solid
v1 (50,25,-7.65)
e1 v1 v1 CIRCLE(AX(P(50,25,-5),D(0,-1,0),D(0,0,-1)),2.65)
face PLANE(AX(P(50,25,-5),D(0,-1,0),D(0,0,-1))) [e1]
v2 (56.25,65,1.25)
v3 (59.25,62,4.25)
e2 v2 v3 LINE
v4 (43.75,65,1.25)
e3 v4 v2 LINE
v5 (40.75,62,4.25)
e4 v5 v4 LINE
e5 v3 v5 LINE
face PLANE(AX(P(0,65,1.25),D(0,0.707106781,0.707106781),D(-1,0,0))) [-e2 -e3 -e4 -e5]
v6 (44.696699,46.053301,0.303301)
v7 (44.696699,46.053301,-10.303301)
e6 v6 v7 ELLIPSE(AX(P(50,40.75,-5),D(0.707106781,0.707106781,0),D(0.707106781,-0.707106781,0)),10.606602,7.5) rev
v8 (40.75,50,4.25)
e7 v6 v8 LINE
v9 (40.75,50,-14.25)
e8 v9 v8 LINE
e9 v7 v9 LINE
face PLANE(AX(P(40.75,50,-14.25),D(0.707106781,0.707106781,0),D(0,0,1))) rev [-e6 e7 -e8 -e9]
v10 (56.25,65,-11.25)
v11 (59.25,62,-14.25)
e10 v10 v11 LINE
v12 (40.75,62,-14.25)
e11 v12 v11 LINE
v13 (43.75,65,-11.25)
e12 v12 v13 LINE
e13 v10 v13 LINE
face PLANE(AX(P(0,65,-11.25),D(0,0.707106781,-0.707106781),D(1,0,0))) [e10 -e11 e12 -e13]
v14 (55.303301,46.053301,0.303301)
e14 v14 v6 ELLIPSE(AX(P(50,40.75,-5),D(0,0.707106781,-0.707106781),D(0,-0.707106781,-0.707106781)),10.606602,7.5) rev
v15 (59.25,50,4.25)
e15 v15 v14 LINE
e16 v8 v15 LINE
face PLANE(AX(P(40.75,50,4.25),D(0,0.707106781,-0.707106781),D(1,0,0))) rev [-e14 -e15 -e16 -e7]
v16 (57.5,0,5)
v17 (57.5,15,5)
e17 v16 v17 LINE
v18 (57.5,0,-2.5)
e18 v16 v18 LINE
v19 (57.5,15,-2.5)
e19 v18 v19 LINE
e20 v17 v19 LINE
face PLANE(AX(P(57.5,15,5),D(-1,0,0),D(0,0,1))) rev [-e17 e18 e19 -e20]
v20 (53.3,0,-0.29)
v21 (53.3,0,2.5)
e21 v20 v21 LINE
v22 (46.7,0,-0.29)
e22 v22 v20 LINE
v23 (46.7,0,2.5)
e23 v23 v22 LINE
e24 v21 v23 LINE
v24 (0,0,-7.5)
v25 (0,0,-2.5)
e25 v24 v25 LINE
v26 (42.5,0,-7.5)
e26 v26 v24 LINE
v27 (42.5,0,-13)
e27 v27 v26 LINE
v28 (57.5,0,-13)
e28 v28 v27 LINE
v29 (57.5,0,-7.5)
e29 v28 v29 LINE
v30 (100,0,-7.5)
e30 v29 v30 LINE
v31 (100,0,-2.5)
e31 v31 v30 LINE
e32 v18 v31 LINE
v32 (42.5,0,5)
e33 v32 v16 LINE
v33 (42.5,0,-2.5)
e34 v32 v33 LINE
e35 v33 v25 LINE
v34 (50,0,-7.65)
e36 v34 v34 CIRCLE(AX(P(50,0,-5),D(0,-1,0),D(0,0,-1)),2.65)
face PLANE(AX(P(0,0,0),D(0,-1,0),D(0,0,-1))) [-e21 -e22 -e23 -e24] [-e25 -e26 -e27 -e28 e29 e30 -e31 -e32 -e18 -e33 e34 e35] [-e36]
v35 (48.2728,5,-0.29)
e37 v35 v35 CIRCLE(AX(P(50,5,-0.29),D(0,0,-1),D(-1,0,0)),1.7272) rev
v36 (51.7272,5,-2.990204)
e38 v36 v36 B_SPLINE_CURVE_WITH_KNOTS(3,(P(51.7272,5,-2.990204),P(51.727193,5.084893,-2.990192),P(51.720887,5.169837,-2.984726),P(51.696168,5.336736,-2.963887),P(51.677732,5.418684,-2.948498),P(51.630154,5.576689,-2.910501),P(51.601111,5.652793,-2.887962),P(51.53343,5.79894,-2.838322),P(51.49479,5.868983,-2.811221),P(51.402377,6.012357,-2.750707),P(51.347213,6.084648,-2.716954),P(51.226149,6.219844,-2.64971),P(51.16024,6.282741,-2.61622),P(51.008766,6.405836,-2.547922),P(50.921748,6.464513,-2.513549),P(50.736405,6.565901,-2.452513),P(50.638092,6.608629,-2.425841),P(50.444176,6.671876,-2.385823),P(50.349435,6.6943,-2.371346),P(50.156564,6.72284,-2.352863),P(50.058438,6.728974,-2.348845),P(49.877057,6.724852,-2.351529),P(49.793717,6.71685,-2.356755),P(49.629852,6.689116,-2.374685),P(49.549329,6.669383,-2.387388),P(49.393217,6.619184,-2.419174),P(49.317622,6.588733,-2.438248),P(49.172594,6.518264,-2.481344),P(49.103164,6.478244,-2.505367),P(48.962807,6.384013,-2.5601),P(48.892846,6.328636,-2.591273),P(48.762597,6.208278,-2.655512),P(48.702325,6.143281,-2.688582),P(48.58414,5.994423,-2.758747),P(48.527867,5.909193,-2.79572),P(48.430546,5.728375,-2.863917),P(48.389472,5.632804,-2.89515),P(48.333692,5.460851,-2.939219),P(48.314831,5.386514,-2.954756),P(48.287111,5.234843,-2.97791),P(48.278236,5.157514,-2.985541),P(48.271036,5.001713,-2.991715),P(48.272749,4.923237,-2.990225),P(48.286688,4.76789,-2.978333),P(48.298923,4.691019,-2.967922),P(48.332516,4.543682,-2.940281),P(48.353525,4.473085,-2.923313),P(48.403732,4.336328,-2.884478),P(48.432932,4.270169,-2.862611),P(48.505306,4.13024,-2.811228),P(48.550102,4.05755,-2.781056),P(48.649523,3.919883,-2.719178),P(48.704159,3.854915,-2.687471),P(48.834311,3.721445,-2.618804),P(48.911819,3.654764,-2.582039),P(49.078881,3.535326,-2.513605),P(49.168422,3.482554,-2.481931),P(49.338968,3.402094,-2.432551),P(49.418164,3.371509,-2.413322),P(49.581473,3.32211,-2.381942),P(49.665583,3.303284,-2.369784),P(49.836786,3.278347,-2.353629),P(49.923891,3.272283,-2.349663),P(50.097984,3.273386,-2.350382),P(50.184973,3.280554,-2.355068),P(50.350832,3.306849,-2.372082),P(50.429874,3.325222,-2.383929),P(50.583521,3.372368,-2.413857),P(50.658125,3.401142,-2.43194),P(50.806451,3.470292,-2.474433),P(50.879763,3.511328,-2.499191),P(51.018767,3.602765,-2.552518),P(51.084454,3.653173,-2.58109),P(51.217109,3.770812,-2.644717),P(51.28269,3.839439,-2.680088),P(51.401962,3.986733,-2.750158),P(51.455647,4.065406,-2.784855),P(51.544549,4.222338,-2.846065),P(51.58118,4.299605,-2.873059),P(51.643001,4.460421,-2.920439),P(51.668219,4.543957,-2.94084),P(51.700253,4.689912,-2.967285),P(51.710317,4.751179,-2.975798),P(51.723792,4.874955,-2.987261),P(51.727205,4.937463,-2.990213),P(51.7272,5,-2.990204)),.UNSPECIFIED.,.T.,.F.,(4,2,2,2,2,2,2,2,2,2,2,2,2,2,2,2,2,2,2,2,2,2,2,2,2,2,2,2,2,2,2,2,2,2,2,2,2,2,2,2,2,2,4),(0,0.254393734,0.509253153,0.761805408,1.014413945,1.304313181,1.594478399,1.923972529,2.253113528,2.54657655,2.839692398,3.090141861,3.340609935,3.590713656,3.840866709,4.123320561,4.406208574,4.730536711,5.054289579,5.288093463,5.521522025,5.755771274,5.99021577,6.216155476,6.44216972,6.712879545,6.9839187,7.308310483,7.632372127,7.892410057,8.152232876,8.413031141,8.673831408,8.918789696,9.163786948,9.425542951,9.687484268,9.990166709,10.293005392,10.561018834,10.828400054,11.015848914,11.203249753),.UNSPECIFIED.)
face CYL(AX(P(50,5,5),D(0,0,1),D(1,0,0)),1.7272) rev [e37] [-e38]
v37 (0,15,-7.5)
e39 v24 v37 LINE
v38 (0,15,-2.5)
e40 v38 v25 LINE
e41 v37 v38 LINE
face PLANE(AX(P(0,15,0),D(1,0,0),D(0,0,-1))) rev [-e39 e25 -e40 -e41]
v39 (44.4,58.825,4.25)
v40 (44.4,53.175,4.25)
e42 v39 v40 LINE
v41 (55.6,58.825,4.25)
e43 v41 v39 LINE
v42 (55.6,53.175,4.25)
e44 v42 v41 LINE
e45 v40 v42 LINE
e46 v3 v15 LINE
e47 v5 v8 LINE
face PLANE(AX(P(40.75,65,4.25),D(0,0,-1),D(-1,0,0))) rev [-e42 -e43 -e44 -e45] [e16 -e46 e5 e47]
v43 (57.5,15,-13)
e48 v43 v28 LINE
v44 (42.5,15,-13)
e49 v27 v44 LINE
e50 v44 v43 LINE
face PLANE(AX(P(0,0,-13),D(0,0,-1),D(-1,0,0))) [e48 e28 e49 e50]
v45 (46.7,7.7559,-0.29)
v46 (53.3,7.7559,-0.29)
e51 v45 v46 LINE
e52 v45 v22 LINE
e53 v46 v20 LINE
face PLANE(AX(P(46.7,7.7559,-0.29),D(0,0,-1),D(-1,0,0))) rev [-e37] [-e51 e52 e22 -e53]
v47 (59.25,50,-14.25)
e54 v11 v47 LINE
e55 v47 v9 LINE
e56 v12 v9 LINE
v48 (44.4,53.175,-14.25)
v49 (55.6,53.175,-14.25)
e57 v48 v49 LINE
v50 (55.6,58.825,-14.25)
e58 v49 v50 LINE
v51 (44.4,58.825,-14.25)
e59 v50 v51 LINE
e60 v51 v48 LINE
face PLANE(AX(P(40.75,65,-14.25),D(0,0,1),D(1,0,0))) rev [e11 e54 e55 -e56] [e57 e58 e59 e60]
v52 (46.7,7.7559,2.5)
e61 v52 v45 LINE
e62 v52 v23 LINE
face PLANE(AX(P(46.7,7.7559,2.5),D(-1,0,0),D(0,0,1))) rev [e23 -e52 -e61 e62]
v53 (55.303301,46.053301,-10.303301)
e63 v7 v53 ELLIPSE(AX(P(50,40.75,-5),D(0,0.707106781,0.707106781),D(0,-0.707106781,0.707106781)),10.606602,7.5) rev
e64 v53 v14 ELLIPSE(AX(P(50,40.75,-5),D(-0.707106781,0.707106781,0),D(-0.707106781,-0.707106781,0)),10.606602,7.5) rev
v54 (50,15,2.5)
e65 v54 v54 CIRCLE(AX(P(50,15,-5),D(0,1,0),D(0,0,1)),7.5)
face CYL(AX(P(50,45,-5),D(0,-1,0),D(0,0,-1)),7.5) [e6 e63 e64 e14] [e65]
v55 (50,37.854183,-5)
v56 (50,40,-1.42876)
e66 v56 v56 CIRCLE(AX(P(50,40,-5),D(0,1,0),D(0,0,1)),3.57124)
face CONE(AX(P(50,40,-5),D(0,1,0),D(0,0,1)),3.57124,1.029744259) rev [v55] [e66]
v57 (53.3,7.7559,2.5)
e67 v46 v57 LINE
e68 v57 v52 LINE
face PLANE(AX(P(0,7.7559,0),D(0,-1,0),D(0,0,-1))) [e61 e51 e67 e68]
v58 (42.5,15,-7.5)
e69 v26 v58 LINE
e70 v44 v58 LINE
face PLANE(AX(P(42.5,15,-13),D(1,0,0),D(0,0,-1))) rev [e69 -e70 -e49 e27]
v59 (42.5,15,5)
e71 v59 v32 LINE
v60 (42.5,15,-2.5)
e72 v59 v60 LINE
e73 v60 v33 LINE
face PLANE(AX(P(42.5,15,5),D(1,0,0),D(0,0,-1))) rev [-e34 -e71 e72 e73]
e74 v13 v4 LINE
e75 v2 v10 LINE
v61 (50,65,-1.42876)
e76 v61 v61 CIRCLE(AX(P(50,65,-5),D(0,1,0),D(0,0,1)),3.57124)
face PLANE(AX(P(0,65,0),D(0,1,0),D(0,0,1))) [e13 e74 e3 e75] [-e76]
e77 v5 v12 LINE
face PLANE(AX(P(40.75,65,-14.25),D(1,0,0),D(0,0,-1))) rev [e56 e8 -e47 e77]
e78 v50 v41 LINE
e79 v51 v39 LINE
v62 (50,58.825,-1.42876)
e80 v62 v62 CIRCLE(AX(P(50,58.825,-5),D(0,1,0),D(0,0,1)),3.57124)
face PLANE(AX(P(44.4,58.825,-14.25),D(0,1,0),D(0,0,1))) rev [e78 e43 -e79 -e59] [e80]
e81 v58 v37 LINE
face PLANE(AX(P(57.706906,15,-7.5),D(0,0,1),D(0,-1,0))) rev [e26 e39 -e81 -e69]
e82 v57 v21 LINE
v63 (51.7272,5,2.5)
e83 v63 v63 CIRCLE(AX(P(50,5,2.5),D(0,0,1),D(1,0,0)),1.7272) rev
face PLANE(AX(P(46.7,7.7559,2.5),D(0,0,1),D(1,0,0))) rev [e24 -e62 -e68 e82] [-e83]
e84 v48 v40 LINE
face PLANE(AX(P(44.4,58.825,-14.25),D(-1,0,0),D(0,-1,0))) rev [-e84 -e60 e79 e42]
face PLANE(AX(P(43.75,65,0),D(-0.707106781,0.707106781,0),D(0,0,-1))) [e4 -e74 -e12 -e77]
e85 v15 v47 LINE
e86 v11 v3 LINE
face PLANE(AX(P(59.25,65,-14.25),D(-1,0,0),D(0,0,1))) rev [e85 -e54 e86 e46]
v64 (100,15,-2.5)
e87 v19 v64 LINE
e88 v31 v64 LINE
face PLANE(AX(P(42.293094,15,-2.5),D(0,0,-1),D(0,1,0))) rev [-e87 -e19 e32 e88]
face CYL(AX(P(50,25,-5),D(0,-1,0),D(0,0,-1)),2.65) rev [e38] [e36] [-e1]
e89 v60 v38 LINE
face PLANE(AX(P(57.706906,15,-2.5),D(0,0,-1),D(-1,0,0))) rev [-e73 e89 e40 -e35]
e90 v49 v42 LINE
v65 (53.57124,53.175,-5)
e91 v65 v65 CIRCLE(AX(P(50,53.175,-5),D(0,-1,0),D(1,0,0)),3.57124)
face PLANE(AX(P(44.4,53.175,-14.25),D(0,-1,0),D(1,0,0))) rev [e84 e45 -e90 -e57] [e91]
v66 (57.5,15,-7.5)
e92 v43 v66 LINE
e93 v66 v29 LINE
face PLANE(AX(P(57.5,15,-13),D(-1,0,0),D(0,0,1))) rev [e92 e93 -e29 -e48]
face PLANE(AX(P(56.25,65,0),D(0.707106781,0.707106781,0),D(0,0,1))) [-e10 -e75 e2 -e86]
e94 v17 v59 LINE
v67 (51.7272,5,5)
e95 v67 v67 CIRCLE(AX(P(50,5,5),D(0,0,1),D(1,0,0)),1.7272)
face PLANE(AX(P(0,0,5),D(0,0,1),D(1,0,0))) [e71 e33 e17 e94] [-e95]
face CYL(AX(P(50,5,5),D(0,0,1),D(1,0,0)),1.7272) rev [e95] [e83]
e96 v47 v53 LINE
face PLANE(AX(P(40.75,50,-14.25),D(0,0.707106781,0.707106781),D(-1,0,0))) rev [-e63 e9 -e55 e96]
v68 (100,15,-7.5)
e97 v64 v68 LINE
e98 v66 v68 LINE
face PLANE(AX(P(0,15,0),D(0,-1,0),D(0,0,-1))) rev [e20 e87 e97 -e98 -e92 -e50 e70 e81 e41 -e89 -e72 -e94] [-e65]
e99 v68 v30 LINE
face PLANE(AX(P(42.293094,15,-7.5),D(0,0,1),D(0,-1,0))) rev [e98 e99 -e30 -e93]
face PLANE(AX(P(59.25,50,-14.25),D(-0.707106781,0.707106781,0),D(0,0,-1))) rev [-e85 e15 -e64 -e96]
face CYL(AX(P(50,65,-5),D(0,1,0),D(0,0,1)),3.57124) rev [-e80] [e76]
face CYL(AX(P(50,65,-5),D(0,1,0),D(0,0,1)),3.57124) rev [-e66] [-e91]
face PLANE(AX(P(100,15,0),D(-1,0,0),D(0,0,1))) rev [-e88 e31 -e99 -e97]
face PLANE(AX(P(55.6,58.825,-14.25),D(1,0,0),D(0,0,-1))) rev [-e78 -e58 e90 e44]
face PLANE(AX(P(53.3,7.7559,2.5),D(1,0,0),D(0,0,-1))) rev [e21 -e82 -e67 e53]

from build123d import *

# Parameters (mm, degrees)
SKETCH1_W                   = 100
SKETCH1_H                   = 10
BOSS_EXTRUDE1_DEPTH         = 15
SKETCH2_R                   = 7.5
BOSS_EXTRUDE2_DEPTH         = 30
SKETCH3_W                   = 18.5
SKETCH3_H                   = 18.5
BOSS_EXTRUDE3_DEPTH         = 20
CHAMFER1_SIZE               = 3
CHAMFER2_SIZE               = 5
SKETCH4_W                   = 11.2
SKETCH4_H                   = 5.65
CUT_EXTRUDE1_DEPTH          = 121.694863188
F_1_4_CLEARANCE_HOLE1_D     = 7.14248
F_1_4_CLEARANCE_HOLE1_DEPTH = 25
F_1_4_CLEARANCE_HOLE1_TIP   = 2.145817477
SKETCH8_W                   = 15
SKETCH8_H                   = 15
BOSS_EXTRUDE4_DEPTH         = 5
SKETCH9_R                   = 2.65
CUT_EXTRUDE2_DEPTH          = 25
F_4_CLEARANCE_HOLE1_D       = 3.4544
F_4_CLEARANCE_HOLE1_DEPTH   = 10
F_4_CLEARANCE_HOLE1_TIP     = 1.037806461
SKETCH13_W                  = 6.6
SKETCH13_H                  = 2.79
CUT_EXTRUDE3_DEPTH          = 7.7559
SKETCH14_W                  = 15
SKETCH14_H                  = 15
BOSS_EXTRUDE5_DEPTH         = 3
SKETCH15_W                  = 2.5
SKETCH15_H                  = 15
CUT_EXTRUDE4_DEPTH          = 42.5
SKETCH16_W                  = 2.5
SKETCH16_H                  = 15
CUT_EXTRUDE5_DEPTH          = 42.5


with BuildPart() as part:
    # Sketch1 → Boss-Extrude1 (new body)
    with BuildSketch(Plane(origin=(0, 0, 0), x_dir=(1, 0, 0), z_dir=(0, 1, 0))):
        with Locations((50, 5)):
            Rectangle(SKETCH1_W, SKETCH1_H)
    extrude(amount=BOSS_EXTRUDE1_DEPTH)

    # Sketch2 → Boss-Extrude2 (add)
    with BuildSketch(Plane(origin=(0, 15, 0), x_dir=(1, 0, 0), z_dir=(0, 1, 0))):
        with Locations(Location((50, 5, 0), (0, 0, 41.810314896))):
            Circle(SKETCH2_R)
    extrude(amount=BOSS_EXTRUDE2_DEPTH)

    # Sketch3 → Boss-Extrude3 (add)
    with BuildSketch(Plane(origin=(0, 45, 0), x_dir=(1, 0, 0), z_dir=(0, 1, 0))):
        with Locations((50, 5)):
            Rectangle(SKETCH3_W, SKETCH3_H)
    extrude(amount=BOSS_EXTRUDE3_DEPTH)

    # Chamfer1
    chamfer1_edges = [part.edges().sort_by_distance(p)[0] for p in [
        (40.75, 65, -5),
        (50, 65, 4.25),
        (59.25, 65, -5),
        (50, 65, -14.25),
    ]]
    chamfer(chamfer1_edges, length=CHAMFER1_SIZE)

    # Chamfer2
    # the kernel refuses this chamfer: 5 mm, written as the material it takes off along each edge
    with BuildSketch(Plane(origin=(27.89158506, 45, -14.25), x_dir=(0, 0.9996219169112968, -0.027495876610586317), z_dir=(1, 0, 0))) as chamfer2_piece_1_section:
        Polygon((CHAMFER2_SIZE * 0.999621916911, CHAMFER2_SIZE * 0.0274958766106), (-CHAMFER2_SIZE * 0.0274958766106, CHAMFER2_SIZE * 0.999621916911), (0, 0), align=None)
    chamfer2_piece_1 = extrude(amount=44.21682988, mode=Mode.PRIVATE)
    chamfer2_piece_1 = chamfer2_piece_1 - Plane(origin=(50, 46.70985324, -5), x_dir=(0.7453559924973537, 0, -0.6666666666695469), z_dir=(0, -1, 0)) * Cylinder(7.5, 109, mode=Mode.PRIVATE)
    with BuildSketch(Plane(origin=(40.75, 45, 17.10841494), x_dir=(-0.027495876610586317, 0.9996219169112968, 0), z_dir=(0, 0, -1))) as chamfer2_piece_2_section:
        Polygon((CHAMFER2_SIZE * 0.999621916911, CHAMFER2_SIZE * 0.0274958766106), (-CHAMFER2_SIZE * 0.0274958766106, CHAMFER2_SIZE * 0.999621916911), (0, 0), align=None)
    chamfer2_piece_2 = extrude(amount=44.21682988, mode=Mode.PRIVATE)
    chamfer2_piece_2 = chamfer2_piece_2 - Plane(origin=(50, 46.709853278, -5), x_dir=(0.7453559924973537, 0, -0.6666666666695469), z_dir=(0, -1, 0)) * Cylinder(7.5, 109, mode=Mode.PRIVATE)
    with BuildSketch(Plane(origin=(59.25, 45, -27.10841494), x_dir=(-0.9996219169112968, -0.027495876610586317, 0), z_dir=(0, 0, 1))) as chamfer2_piece_3_section:
        Polygon((CHAMFER2_SIZE * 0.999621916911, -CHAMFER2_SIZE * 0.0274958766106), (-CHAMFER2_SIZE * 0.0274958766106, -CHAMFER2_SIZE * 0.999621916911), (0, 0), align=None)
    chamfer2_piece_3 = extrude(amount=44.21682988, mode=Mode.PRIVATE)
    chamfer2_piece_3 = chamfer2_piece_3 - Plane(origin=(50, 46.709853248, -5), x_dir=(0.7453559924973537, 0, -0.6666666666695469), z_dir=(0, -1, 0)) * Cylinder(7.5, 109, mode=Mode.PRIVATE)
    with BuildSketch(Plane(origin=(72.10841494, 45, 4.25), x_dir=(0, -0.027495876610586317, -0.9996219169112968), z_dir=(-1, 0, 0))) as chamfer2_piece_4_section:
        Polygon((CHAMFER2_SIZE * 0.999621916911, -CHAMFER2_SIZE * 0.0274958766106), (-CHAMFER2_SIZE * 0.0274958766106, -CHAMFER2_SIZE * 0.999621916911), (0, 0), align=None)
    chamfer2_piece_4 = extrude(amount=44.21682988, mode=Mode.PRIVATE)
    chamfer2_piece_4 = chamfer2_piece_4 - Plane(origin=(50, 46.709853226, -5), x_dir=(0.7453559924973537, 0, -0.6666666666695469), z_dir=(0, -1, 0)) * Cylinder(7.5, 109, mode=Mode.PRIVATE)
    add([chamfer2_piece_1, chamfer2_piece_2, chamfer2_piece_3, chamfer2_piece_4], mode=Mode.SUBTRACT)

    # Sketch4 → Cut-Extrude1 (cut, through all)
    with BuildSketch(Plane.XY.offset(4.25)):
        with Locations((50, 56)):
            Rectangle(SKETCH4_W, SKETCH4_H)
    extrude(amount=-CUT_EXTRUDE1_DEPTH, mode=Mode.SUBTRACT)

    # 1/4 Clearance Hole1
    with Locations(Plane(origin=(0, 65, 0), x_dir=(1, 0, 0), z_dir=(0, 1, 0))):
        with Locations((50, 5)):
            Hole(F_1_4_CLEARANCE_HOLE1_D / 2, depth=F_1_4_CLEARANCE_HOLE1_DEPTH)
            with Locations((0, 0, -(F_1_4_CLEARANCE_HOLE1_DEPTH + F_1_4_CLEARANCE_HOLE1_TIP / 2))):  # 118° drill point
                Cone(0, F_1_4_CLEARANCE_HOLE1_D / 2, F_1_4_CLEARANCE_HOLE1_TIP, mode=Mode.SUBTRACT)

    # Sketch8 → Boss-Extrude4 (add)
    with BuildSketch(Plane.XY):
        with Locations((50, 7.5)):
            Rectangle(SKETCH8_W, SKETCH8_H)
    extrude(amount=BOSS_EXTRUDE4_DEPTH)

    # Sketch9 → Cut-Extrude2 (cut)
    with BuildSketch(Plane.XZ):
        with Locations(Location((50, -5, 0), (0, 0, 270))):
            Circle(SKETCH9_R)
    extrude(amount=-CUT_EXTRUDE2_DEPTH, mode=Mode.SUBTRACT)

    # #4 Clearance Hole1
    with Locations(Plane.XY.offset(5)):
        with Locations((50, 5)):
            Hole(F_4_CLEARANCE_HOLE1_D / 2, depth=F_4_CLEARANCE_HOLE1_DEPTH)
            with Locations((0, 0, -(F_4_CLEARANCE_HOLE1_DEPTH + F_4_CLEARANCE_HOLE1_TIP / 2))):  # 118° drill point
                Cone(0, F_4_CLEARANCE_HOLE1_D / 2, F_4_CLEARANCE_HOLE1_TIP, mode=Mode.SUBTRACT)

    # Sketch13 → Cut-Extrude3 (cut)
    with BuildSketch(Plane.XZ):
        with Locations((50, 1.105)):
            Rectangle(SKETCH13_W, SKETCH13_H)
    extrude(amount=-CUT_EXTRUDE3_DEPTH, mode=Mode.SUBTRACT)

    # Sketch14 → Boss-Extrude5 (add)
    with BuildSketch(Plane(origin=(0, 0, -10), x_dir=(-1, 0, 0), z_dir=(0, 0, -1))):
        with Locations((-50, 7.5)):
            Rectangle(SKETCH14_W, SKETCH14_H)
    extrude(amount=BOSS_EXTRUDE5_DEPTH)

    # Sketch15 → Cut-Extrude4 (cut)
    with BuildSketch(Plane(origin=(100, 0, 0), x_dir=(0, 0, -1), z_dir=(1, 0, 0))):
        with Locations((1.25, 7.5)):
            Rectangle(SKETCH15_W, SKETCH15_H)
        with Locations((8.75, 7.5)):
            Rectangle(SKETCH15_W, SKETCH15_H)
    extrude(amount=-CUT_EXTRUDE4_DEPTH, mode=Mode.SUBTRACT)

    # Sketch16 → Cut-Extrude5 (cut)
    with BuildSketch(Plane.ZY):
        with Locations((-8.75, 7.5)):
            Rectangle(SKETCH16_W, SKETCH16_H)
        with Locations((-1.25, 7.5)):
            Rectangle(SKETCH16_W, SKETCH16_H)
    extrude(amount=-CUT_EXTRUDE5_DEPTH, mode=Mode.SUBTRACT)


solid = part.part
